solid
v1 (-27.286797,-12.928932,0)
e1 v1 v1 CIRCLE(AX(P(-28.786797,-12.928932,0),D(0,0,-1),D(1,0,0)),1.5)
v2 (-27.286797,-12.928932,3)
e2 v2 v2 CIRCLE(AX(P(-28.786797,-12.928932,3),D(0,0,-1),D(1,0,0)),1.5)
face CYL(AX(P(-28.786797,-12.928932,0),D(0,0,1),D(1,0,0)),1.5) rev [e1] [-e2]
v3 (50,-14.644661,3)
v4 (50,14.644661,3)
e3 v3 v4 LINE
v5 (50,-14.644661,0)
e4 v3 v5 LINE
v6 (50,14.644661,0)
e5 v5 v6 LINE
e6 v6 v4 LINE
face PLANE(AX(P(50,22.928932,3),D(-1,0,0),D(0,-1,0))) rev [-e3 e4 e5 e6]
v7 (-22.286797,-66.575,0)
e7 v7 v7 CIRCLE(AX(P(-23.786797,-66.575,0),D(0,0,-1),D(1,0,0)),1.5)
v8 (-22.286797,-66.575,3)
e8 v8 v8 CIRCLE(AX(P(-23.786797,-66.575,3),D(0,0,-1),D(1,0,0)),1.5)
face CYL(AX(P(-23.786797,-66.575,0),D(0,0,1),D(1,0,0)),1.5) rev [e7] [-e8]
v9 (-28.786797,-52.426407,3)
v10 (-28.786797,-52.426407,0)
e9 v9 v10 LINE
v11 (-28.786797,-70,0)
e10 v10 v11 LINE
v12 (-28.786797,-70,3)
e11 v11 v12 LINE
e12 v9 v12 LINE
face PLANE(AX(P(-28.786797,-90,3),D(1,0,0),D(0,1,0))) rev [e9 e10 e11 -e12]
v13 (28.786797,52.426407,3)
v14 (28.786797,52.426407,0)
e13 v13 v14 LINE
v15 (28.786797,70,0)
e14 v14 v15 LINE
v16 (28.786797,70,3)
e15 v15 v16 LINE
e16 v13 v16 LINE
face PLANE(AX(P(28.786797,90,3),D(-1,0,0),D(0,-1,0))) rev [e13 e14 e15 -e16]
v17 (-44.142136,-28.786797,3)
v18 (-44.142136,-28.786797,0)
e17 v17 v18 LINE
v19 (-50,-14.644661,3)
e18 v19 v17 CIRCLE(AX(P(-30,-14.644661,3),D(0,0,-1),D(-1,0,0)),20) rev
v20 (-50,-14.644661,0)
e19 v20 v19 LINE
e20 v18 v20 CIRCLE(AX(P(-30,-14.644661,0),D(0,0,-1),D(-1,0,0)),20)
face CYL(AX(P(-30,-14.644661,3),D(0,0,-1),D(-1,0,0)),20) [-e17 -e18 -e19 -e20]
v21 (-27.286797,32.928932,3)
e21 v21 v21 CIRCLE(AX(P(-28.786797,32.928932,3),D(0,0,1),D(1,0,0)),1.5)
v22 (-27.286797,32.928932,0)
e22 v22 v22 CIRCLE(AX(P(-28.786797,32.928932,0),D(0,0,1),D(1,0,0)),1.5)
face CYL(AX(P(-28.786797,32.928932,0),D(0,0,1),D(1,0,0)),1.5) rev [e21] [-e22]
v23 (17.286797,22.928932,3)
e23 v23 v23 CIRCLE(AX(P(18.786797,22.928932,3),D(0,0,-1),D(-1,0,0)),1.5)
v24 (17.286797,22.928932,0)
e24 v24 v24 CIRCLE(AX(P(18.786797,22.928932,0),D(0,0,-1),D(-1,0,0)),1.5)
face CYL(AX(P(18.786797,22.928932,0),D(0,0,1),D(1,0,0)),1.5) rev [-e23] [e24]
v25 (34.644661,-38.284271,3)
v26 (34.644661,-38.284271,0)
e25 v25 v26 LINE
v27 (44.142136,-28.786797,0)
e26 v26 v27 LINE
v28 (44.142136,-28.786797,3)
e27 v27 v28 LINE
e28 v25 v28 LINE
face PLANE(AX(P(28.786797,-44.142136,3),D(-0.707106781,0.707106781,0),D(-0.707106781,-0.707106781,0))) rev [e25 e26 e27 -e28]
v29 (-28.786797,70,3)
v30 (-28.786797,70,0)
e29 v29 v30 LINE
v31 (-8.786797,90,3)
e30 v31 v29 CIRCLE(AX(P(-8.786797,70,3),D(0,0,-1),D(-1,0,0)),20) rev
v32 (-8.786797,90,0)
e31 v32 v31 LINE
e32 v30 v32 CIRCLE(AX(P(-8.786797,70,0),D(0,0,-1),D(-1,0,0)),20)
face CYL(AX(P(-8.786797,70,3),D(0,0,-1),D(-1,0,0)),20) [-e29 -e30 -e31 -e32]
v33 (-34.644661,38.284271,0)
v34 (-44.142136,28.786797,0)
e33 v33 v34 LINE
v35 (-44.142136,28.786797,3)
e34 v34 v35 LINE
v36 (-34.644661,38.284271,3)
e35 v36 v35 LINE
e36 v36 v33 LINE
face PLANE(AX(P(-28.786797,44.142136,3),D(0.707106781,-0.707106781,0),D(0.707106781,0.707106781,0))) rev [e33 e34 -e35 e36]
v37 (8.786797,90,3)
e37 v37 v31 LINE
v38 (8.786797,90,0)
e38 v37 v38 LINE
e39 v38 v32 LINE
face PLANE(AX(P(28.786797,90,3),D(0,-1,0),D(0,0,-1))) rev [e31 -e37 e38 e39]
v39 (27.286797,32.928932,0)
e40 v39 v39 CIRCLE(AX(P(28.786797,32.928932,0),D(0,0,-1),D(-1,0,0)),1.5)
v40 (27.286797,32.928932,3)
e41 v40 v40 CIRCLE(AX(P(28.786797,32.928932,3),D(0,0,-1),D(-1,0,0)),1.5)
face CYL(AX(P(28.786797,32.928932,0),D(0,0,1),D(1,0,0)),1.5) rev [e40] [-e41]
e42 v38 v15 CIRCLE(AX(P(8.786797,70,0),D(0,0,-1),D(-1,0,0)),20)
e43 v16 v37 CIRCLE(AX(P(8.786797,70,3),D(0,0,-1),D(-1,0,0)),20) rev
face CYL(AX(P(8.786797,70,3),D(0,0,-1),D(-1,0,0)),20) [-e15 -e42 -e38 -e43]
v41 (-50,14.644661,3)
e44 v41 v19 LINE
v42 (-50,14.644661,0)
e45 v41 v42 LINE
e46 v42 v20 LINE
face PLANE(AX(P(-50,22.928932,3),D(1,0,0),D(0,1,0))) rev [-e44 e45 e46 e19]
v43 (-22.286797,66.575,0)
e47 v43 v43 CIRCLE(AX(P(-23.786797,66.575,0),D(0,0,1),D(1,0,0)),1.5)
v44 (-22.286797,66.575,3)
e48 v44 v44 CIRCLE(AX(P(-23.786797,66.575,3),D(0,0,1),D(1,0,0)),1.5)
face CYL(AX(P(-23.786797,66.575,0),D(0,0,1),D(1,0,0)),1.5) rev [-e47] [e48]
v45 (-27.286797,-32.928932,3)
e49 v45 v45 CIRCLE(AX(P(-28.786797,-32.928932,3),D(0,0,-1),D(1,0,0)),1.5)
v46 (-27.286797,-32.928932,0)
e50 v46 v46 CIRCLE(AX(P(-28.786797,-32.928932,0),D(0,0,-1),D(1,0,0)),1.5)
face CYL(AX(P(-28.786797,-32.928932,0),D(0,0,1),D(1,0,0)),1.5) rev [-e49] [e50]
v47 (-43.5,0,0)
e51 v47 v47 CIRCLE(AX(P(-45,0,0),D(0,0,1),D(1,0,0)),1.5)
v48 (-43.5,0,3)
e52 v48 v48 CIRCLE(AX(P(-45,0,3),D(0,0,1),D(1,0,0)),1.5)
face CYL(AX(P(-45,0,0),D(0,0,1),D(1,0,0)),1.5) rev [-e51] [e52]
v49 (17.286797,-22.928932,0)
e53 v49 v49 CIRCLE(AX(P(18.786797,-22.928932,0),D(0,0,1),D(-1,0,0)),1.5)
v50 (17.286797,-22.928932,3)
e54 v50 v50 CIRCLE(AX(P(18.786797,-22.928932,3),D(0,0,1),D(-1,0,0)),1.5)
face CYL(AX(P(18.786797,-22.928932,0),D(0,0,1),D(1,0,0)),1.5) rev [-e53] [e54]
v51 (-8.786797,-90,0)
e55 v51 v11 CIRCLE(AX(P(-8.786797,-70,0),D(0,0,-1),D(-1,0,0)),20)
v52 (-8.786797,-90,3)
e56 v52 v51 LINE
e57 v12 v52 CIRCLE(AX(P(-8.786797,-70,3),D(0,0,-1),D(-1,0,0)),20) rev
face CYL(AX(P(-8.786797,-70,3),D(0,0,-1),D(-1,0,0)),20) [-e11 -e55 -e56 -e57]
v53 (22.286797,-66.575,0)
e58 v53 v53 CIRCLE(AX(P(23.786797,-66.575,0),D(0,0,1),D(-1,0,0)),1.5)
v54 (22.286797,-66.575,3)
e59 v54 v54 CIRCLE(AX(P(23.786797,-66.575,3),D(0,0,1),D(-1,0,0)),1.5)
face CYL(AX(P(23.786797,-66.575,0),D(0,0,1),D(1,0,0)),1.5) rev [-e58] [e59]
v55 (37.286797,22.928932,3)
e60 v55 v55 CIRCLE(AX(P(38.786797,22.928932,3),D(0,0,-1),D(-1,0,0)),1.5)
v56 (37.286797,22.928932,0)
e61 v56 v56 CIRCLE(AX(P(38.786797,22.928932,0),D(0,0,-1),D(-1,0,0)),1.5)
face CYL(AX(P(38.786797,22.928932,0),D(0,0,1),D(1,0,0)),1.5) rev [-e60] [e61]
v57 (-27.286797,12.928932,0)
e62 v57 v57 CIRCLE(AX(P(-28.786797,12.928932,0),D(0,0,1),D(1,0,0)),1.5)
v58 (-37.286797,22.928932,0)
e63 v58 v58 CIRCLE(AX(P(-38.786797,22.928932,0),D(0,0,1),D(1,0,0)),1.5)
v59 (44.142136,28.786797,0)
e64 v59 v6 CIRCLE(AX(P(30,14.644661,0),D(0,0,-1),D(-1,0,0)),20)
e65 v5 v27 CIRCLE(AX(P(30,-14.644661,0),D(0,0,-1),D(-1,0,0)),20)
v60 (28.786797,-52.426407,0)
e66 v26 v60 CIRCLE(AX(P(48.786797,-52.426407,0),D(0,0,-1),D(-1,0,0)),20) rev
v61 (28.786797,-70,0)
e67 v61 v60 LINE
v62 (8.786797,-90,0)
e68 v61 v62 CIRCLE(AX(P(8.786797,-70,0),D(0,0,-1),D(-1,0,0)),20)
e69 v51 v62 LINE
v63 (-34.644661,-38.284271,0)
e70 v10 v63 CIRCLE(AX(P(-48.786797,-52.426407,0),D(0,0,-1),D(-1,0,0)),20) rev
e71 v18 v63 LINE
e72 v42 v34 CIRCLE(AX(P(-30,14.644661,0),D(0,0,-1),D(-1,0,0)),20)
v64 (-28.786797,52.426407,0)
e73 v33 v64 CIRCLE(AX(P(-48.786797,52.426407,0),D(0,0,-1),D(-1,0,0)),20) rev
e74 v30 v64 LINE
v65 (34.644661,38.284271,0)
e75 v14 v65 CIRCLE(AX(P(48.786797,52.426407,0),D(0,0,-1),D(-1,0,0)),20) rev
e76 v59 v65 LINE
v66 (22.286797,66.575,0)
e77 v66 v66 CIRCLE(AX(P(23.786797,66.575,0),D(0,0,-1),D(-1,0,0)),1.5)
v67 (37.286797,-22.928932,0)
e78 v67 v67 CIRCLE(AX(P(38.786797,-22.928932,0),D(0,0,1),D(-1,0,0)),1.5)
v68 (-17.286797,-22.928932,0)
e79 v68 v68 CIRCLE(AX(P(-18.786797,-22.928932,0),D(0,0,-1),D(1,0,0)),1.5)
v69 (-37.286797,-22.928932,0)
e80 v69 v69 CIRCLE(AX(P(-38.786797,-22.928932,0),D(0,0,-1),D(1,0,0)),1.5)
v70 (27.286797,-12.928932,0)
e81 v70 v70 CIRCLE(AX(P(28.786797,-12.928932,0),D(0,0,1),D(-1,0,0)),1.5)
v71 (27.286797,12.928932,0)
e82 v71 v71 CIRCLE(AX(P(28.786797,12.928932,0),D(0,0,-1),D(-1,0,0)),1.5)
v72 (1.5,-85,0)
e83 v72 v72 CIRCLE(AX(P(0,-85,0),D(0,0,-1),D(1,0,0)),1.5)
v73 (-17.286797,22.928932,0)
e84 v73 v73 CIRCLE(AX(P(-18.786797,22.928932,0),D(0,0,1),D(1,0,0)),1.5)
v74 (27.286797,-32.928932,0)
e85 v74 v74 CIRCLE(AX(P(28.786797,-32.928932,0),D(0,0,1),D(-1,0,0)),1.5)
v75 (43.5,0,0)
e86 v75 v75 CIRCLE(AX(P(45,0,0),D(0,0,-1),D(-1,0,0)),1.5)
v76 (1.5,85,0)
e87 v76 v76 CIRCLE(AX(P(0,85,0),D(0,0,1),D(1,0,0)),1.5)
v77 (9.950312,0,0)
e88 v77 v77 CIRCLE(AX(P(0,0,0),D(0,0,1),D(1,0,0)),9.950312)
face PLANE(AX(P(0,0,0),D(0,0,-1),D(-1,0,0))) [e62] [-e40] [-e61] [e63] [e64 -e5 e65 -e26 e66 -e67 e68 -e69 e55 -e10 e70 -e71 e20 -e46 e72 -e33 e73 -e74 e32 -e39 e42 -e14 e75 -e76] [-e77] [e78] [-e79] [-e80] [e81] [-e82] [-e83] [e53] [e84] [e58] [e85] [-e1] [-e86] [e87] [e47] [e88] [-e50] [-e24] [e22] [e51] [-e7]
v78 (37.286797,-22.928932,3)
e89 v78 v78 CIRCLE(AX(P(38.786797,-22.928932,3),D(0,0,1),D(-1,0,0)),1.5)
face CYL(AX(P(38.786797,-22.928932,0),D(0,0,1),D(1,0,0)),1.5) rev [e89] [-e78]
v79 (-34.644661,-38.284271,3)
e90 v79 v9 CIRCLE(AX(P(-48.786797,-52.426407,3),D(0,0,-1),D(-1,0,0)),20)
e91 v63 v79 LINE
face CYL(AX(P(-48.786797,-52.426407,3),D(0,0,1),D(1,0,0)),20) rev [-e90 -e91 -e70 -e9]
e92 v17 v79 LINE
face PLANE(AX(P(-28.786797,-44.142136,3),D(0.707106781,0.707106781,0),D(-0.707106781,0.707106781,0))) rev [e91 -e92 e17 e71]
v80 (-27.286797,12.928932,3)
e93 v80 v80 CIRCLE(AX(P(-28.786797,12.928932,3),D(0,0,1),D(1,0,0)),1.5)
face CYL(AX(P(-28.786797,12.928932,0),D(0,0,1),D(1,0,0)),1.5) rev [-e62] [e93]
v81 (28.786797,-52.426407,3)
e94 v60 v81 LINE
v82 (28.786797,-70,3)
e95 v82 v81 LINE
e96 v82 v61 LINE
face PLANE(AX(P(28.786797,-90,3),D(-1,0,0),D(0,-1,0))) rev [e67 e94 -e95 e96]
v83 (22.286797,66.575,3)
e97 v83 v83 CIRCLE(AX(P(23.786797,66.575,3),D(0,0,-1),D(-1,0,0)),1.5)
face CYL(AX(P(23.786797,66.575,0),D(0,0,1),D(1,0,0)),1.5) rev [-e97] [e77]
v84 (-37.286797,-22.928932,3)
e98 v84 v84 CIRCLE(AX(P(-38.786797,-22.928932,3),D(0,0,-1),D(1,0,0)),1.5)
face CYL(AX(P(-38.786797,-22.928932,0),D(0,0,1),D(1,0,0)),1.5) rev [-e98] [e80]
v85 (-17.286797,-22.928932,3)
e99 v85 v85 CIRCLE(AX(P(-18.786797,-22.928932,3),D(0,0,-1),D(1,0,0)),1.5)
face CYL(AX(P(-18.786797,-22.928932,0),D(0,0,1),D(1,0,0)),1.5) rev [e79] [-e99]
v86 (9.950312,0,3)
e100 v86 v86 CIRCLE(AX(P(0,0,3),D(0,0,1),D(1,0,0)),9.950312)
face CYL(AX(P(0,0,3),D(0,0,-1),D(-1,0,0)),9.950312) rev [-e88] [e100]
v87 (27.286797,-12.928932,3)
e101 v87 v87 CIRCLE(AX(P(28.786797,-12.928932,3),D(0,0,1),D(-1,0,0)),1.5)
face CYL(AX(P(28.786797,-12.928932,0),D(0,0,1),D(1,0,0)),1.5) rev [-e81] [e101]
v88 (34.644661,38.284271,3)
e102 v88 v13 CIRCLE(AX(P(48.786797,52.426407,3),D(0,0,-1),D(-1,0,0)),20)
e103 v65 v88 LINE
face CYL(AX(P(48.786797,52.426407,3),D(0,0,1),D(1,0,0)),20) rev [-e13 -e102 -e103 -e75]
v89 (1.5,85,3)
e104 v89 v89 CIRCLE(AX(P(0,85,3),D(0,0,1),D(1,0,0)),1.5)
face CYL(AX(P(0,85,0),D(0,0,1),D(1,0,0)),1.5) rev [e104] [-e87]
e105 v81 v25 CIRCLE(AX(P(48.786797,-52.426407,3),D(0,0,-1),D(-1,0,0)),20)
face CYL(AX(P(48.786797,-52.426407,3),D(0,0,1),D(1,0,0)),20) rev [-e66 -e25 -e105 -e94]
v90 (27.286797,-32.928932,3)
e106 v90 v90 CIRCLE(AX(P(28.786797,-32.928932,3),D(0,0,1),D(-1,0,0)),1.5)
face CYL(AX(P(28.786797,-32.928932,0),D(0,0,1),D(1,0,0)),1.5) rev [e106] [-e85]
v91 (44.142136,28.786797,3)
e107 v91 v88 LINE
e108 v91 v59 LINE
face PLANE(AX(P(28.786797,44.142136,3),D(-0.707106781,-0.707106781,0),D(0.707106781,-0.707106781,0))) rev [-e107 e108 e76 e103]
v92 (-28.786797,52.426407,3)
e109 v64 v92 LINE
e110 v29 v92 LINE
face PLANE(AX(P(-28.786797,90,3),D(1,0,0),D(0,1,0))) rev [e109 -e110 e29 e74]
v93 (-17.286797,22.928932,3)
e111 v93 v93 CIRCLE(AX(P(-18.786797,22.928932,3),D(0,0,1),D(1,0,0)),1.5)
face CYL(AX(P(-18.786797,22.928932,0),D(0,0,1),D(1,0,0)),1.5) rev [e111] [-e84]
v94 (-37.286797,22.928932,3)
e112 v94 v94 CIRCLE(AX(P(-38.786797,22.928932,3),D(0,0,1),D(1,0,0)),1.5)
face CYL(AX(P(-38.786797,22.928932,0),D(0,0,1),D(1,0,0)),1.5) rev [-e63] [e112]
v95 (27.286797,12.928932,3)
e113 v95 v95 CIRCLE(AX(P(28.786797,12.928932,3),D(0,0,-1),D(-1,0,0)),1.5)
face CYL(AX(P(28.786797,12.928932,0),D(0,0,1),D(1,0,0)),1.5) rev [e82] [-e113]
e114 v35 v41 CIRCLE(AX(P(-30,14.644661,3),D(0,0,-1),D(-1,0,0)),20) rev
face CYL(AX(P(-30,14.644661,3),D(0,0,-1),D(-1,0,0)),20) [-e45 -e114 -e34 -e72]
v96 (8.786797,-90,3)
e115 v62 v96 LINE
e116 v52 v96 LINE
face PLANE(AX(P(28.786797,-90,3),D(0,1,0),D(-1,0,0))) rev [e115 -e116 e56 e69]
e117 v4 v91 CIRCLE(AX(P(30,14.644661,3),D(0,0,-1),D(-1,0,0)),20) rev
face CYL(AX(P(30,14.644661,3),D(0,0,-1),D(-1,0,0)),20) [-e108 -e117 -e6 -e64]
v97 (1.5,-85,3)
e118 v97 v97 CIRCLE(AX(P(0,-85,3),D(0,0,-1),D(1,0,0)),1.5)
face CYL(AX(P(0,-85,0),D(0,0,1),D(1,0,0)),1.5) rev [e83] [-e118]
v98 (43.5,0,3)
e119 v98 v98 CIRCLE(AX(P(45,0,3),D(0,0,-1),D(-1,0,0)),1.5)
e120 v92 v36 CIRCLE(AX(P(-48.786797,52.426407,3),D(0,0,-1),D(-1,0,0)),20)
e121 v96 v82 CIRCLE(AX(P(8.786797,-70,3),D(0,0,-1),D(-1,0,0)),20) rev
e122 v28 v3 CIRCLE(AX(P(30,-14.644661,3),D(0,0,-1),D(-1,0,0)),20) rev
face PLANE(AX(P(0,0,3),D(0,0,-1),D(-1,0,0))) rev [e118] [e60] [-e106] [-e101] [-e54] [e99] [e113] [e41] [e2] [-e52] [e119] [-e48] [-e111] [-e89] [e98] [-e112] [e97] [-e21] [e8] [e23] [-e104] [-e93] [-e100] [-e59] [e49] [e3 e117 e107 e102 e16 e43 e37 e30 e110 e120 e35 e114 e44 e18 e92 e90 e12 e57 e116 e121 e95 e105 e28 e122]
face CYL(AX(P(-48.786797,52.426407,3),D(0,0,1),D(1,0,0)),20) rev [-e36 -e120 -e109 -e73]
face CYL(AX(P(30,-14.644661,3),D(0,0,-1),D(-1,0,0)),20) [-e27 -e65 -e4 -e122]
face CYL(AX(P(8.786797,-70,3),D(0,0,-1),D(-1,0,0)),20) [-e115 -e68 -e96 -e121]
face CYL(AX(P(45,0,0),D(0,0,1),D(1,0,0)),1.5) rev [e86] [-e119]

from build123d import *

# Parameters (mm, degrees)
BOSS_EXTRUDE1_OUTLINE_R                    = 9.950311947
BOSS_EXTRUDE1_DEPTH                        = 3
SKETCH2_R                                  = 1.5
CUT_EXTRUDE1_DEPTH                         = 104
MIRROR1_AT_THE_SECOND_PLANE_COPY_1_SKETC_R = 1.5
MIRROR1_AT_THE_SECOND_PLANE_COPY_1_DEPTH   = 104
SKETCH3_R                                  = 1.5
CUT_EXTRUDE2_DEPTH                         = 104
MIRROR2_AT_THE_SECOND_PLANE_COPY_1_SKETC_R = 1.5
MIRROR2_AT_THE_SECOND_PLANE_COPY_1_DEPTH   = 104
FILLET1_R                                  = 20


# Read off the part's stored shape, not the designer's step: Boss-Extrude1
with BuildPart() as part:
    # Boss-Extrude1 outline → Boss-Extrude1 (new body)
    with BuildSketch(Plane.XY):
        Polygon((28.786796564, 44.142135624), (28.786796564, 90), (-28.786796564, 90), (-28.786796564, 44.142135624), (-50, 22.928932188), (-50, -22.928932188), (-28.786796564, -44.142135624), (-28.786796564, -90), (28.786796564, -90), (28.786796564, -44.142135624), (50, -22.928932188), (50, 22.928932188), align=None)
        Circle(BOSS_EXTRUDE1_OUTLINE_R, mode=Mode.SUBTRACT)
    extrude(amount=BOSS_EXTRUDE1_DEPTH)

    # Sketch2 → Cut-Extrude1 (cut, through all)
    with BuildSketch(Plane.XY.offset(3)):
        with Locations((-28.786796564, 32.928932188)):
            Circle(SKETCH2_R)
        with Locations((-18.786796564, 22.928932188)):
            Circle(SKETCH2_R)
        with Locations((-28.786796564, 12.928932188)):
            Circle(SKETCH2_R)
        with Locations((-38.786796564, 22.928932188)):
            Circle(SKETCH2_R)
    cut_extrude1 = extrude(amount=-CUT_EXTRUDE1_DEPTH, mode=Mode.SUBTRACT)

    # Mirror1: Cut-Extrude1 across plane
    add(cut_extrude1.mirror(Plane(origin=(0, 0, 0), x_dir=(0, 0, 1), z_dir=(1, 0, 0))), mode=Mode.SUBTRACT)

    # Mirror1 at the second plane: Cut-Extrude1 across plane
    add(cut_extrude1.mirror(Plane.ZX), mode=Mode.SUBTRACT)

    # Mirror1 at the second plane copy 1 sketc → Mirror1 at the second plane copy 1 (cut, through all)
    with BuildSketch(Plane(origin=(0, 0, 3), x_dir=(-1, 0, 0), z_dir=(0, 0, 1))):
        with Locations((-28.786796564, 32.928932188)):
            Circle(MIRROR1_AT_THE_SECOND_PLANE_COPY_1_SKETC_R)
        with Locations((-18.786796564, 22.928932188)):
            Circle(MIRROR1_AT_THE_SECOND_PLANE_COPY_1_SKETC_R)
        with Locations((-28.786796564, 12.928932188)):
            Circle(MIRROR1_AT_THE_SECOND_PLANE_COPY_1_SKETC_R)
        with Locations((-38.786796564, 22.928932188)):
            Circle(MIRROR1_AT_THE_SECOND_PLANE_COPY_1_SKETC_R)
    extrude(amount=-MIRROR1_AT_THE_SECOND_PLANE_COPY_1_DEPTH, mode=Mode.SUBTRACT)

    # Sketch3 → Cut-Extrude2 (cut, through all)
    with BuildSketch(Plane.XY.offset(3)):
        with Locations((0, 85)):
            Circle(SKETCH3_R)
        with Locations((-23.786796564, 66.575)):
            Circle(SKETCH3_R)
        with Locations((-45, 0)):
            Circle(SKETCH3_R)
    cut_extrude2 = extrude(amount=-CUT_EXTRUDE2_DEPTH, mode=Mode.SUBTRACT)

    # Mirror2: Cut-Extrude2 across plane
    add(cut_extrude2.mirror(Plane(origin=(0, 0, 0), x_dir=(0, 0, 1), z_dir=(1, 0, 0))), mode=Mode.SUBTRACT)

    # Mirror2 at the second plane: Cut-Extrude2 across plane
    add(cut_extrude2.mirror(Plane.ZX), mode=Mode.SUBTRACT)

    # Mirror2 at the second plane copy 1 sketc → Mirror2 at the second plane copy 1 (cut, through all)
    with BuildSketch(Plane(origin=(0, 0, 3), x_dir=(-1, 0, 0), z_dir=(0, 0, 1))):
        with Locations((0, 85)):
            Circle(MIRROR2_AT_THE_SECOND_PLANE_COPY_1_SKETC_R)
        with Locations((-23.786796564, 66.575)):
            Circle(MIRROR2_AT_THE_SECOND_PLANE_COPY_1_SKETC_R)
        with Locations((-45, 0)):
            Circle(MIRROR2_AT_THE_SECOND_PLANE_COPY_1_SKETC_R)
    extrude(amount=-MIRROR2_AT_THE_SECOND_PLANE_COPY_1_DEPTH, mode=Mode.SUBTRACT)

    # Fillet1
    fillet1_edges = [part.edges().sort_by_distance(p)[0] for p in [
        (28.786796564, 44.142135624, 1.5),
        (50, 22.928932188, 1.5),
        (50, -22.928932188, 1.5),
        (28.786796564, -44.142135624, 1.5),
        (28.786796564, -90, 1.5),
        (-28.786796564, -90, 1.5),
        (-28.786796564, -44.142135624, 1.5),
        (-50, -22.928932188, 1.5),
        (-50, 22.928932188, 1.5),
        (-28.786796564, 44.142135624, 1.5),
        (-28.786796564, 90, 1.5),
        (28.786796564, 90, 1.5),
    ]]
    fillet(fillet1_edges, radius=FILLET1_R)


solid = part.part
